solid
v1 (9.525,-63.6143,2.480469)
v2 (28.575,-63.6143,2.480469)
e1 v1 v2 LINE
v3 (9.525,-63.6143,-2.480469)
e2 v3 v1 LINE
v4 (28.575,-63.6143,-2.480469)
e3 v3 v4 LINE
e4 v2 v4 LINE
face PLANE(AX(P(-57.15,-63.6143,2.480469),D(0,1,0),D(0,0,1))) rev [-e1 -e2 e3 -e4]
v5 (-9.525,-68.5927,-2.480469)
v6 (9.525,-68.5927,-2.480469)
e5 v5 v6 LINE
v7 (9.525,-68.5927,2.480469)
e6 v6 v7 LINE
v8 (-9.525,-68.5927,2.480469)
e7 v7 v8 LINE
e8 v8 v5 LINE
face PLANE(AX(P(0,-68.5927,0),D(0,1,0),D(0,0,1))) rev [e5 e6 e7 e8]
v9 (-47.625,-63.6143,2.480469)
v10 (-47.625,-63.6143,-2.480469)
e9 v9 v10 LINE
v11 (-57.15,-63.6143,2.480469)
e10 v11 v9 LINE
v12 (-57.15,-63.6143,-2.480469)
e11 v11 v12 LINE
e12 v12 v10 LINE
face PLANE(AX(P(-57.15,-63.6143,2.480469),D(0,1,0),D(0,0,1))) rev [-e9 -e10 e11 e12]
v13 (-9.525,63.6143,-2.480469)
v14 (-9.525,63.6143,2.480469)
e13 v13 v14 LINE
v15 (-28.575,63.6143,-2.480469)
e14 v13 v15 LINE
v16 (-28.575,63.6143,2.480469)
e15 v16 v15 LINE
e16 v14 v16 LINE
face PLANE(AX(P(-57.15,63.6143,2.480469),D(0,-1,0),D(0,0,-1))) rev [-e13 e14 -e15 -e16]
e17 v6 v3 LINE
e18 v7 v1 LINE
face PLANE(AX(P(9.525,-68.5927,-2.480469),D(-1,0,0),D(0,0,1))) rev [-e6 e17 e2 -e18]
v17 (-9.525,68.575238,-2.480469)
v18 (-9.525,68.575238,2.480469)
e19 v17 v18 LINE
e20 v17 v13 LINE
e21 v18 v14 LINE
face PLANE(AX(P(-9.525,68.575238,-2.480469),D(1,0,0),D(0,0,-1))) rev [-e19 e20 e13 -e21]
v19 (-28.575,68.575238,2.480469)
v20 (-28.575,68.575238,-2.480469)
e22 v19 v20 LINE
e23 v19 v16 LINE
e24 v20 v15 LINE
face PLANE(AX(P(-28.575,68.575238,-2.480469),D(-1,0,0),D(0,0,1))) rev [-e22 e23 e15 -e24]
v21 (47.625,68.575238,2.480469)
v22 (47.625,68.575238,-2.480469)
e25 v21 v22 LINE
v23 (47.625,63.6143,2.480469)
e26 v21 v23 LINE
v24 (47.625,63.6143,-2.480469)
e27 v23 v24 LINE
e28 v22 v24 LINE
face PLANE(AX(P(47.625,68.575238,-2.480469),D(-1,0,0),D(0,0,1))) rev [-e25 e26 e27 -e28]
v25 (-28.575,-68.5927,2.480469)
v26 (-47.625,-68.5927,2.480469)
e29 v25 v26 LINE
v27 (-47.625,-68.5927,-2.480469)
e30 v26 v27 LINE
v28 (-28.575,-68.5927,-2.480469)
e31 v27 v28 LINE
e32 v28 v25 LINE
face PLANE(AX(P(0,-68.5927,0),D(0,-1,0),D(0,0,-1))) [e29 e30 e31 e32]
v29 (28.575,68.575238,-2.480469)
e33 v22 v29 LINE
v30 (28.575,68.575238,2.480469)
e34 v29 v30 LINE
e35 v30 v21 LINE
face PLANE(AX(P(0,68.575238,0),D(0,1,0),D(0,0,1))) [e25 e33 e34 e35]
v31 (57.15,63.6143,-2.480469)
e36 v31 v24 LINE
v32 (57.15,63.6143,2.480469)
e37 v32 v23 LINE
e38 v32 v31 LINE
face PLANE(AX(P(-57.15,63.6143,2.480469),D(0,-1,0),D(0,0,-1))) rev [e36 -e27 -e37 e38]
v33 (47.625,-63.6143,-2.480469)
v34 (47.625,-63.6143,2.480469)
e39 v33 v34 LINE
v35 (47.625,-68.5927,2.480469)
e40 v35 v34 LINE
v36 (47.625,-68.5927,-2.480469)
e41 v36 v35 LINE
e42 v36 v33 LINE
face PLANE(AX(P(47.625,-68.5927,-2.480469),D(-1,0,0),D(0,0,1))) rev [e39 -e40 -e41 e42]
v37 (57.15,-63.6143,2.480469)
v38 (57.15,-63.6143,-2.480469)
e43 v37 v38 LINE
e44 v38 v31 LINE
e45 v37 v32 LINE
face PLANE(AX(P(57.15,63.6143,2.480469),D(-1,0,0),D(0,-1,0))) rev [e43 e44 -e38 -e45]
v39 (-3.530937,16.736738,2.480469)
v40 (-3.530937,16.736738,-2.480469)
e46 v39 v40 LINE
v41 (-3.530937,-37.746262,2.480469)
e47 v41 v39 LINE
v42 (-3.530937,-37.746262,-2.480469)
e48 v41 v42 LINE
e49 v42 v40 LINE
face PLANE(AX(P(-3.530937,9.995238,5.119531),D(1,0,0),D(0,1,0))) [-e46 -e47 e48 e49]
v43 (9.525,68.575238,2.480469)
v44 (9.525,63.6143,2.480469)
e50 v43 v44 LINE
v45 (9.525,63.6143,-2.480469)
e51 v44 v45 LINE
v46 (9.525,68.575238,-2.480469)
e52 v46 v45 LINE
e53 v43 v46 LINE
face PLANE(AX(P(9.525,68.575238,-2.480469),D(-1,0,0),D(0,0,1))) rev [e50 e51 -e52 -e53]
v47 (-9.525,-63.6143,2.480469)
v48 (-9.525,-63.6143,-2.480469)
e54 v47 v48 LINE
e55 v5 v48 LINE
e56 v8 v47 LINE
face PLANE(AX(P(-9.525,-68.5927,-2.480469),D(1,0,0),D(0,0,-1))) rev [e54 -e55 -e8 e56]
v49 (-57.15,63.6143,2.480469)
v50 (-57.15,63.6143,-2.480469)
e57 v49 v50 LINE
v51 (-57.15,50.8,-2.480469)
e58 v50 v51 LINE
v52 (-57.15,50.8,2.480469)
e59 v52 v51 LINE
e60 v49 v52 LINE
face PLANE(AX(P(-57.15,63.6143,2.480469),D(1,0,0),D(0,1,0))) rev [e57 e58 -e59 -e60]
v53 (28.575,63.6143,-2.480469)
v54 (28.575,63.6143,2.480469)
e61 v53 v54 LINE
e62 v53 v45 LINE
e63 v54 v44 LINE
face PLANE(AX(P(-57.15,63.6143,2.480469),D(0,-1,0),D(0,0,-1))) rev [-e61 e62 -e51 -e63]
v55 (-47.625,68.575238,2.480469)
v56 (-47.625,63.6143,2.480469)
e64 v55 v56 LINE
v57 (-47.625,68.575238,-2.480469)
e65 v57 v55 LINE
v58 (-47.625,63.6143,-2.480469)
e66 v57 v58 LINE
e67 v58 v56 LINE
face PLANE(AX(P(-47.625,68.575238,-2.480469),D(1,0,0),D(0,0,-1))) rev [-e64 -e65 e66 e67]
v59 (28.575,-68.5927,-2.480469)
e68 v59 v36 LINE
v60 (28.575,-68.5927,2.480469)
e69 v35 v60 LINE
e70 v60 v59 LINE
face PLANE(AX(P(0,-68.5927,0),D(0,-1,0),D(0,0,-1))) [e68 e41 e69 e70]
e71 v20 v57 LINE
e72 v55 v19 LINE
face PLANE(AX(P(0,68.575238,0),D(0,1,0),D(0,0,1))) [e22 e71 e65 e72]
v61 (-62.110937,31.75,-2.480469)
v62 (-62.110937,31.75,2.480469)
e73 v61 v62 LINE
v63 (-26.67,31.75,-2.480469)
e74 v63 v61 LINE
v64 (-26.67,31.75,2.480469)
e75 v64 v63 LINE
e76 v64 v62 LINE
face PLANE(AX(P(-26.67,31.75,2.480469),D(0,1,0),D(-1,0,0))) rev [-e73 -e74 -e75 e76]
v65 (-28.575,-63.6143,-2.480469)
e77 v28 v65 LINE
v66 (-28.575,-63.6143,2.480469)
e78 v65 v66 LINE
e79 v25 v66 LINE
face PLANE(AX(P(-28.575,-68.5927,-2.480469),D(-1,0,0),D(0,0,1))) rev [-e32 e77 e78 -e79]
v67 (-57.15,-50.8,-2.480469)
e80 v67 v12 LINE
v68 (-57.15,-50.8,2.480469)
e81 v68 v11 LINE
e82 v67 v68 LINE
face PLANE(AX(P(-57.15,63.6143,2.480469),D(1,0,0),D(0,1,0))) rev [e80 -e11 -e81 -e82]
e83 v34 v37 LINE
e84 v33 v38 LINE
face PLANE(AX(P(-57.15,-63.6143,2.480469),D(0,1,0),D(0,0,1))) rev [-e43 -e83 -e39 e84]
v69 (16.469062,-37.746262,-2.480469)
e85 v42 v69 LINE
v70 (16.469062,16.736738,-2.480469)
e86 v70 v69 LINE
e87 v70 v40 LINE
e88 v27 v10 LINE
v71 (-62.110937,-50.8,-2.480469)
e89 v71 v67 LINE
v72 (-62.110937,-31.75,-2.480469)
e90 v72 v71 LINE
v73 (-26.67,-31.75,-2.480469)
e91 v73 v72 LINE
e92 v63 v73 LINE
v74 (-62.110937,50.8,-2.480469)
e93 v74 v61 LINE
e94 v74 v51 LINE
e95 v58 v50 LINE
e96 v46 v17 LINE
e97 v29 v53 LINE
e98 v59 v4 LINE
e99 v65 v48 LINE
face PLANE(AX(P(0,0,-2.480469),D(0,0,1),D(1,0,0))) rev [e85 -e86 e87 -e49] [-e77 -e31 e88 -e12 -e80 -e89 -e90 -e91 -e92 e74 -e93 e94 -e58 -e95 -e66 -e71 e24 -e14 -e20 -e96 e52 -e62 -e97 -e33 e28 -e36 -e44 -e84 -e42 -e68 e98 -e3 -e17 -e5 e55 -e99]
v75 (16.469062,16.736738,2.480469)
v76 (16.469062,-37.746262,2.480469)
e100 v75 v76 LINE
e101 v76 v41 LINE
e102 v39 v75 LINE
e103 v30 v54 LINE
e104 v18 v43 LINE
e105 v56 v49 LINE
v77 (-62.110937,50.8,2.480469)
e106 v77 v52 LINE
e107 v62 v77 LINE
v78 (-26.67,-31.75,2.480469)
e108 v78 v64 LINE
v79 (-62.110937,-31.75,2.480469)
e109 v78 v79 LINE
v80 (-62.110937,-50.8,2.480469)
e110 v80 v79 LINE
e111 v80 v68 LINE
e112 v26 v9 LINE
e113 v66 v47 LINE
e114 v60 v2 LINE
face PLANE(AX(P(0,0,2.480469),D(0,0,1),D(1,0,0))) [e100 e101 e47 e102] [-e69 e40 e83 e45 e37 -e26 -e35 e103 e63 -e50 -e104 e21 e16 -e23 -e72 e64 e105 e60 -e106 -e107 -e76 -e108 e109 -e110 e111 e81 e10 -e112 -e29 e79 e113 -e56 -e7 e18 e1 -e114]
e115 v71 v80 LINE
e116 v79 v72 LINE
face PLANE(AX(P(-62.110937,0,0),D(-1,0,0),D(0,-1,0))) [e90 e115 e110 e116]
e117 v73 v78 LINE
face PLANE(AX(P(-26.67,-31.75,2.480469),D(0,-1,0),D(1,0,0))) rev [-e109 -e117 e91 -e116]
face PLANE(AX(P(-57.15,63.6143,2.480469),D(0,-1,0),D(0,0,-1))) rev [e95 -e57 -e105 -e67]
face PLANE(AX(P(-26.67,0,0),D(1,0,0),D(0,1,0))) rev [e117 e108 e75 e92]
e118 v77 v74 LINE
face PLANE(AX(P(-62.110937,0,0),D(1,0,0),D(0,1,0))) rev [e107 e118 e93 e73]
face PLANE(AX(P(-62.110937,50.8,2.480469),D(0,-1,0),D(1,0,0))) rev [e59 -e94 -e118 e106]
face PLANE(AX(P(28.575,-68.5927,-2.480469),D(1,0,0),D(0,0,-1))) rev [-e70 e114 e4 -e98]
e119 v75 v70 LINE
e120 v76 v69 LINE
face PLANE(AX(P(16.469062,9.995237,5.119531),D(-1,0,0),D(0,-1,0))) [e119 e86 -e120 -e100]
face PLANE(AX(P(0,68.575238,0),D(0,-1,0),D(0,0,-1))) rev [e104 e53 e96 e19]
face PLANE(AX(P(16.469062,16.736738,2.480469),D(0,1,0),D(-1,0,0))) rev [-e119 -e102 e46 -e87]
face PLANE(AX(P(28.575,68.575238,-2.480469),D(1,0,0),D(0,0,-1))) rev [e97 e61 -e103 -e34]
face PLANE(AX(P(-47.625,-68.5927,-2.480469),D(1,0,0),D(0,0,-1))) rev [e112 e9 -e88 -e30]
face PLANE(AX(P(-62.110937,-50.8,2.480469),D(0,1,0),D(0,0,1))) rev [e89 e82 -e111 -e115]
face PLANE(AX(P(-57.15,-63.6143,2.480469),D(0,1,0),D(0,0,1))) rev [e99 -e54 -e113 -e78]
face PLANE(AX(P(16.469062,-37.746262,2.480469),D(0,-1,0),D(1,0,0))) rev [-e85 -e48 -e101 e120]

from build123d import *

# Parameters (mm, degrees)
SKETCH1_W           = 114.3
SKETCH1_H           = 127.2286
BOSS_EXTRUDE1_DEPTH = 2.48046875
SKETCH3_W           = 19.05
SKETCH3_H           = 4.9609375
BOSS_EXTRUDE2_DEPTH = 4.9609375
SKETCH5_W           = 19.05
SKETCH5_H           = 4.9609375
BOSS_EXTRUDE3_DEPTH = 4.9784
SKETCH7_W           = 4.9609375
SKETCH7_H           = 63.5
CUT_EXTRUDE1_DEPTH  = 30.48
SKETCH6_W           = 4.9609375
SKETCH6_H           = 19.05
BOSS_EXTRUDE4_DEPTH = 4.9609375
CAVITY1_START       = -3.0309375
CAVITY1_2_OUTLINE_W = 41
CAVITY1_2_OUTLINE_H = 4.9609375
CAVITY1_2_DEPTH     = 19
CAVITY1_START_2     = -2.3309375
CAVITY1_3_DEPTH     = 17.6
CAVITY1_START_3     = -3
CAVITY1_4_DEPTH     = 6
CAVITY1_START_4     = 0.91953125
CAVITY1_6_OUTLINE_R = 3
CAVITY1_6_DEPTH     = 1.5609375
SKETCH9_W           = 20
SKETCH9_H           = 54.483
CUT_EXTRUDE2_DEPTH  = 93.827315363


with BuildPart() as part:
    # Sketch1 → Boss-Extrude1 (new, symmetric)
    with BuildSketch(Plane.XY):
        Rectangle(SKETCH1_W, SKETCH1_H)
    extrude(amount=BOSS_EXTRUDE1_DEPTH, both=True)

    # Sketch3 → Boss-Extrude2 (add)
    with BuildSketch(Plane(origin=(0, 63.6143, 0), x_dir=(1, 0, 0), z_dir=(0, 1, 0))):
        with Locations((38.1, 0)):
            Rectangle(SKETCH3_W, SKETCH3_H)
        Rectangle(SKETCH3_W, SKETCH3_H)
        with Locations((-38.1, 0)):
            Rectangle(SKETCH3_W, SKETCH3_H)
    extrude(amount=BOSS_EXTRUDE2_DEPTH)

    # Sketch5 → Boss-Extrude3 (add)
    with BuildSketch(Plane.XZ.offset(63.6143)):
        Rectangle(SKETCH5_W, SKETCH5_H)
        with Locations((38.1, 0)):
            Rectangle(SKETCH5_W, SKETCH5_H)
        with Locations((-38.1, 0)):
            Rectangle(SKETCH5_W, SKETCH5_H)
    extrude(amount=BOSS_EXTRUDE3_DEPTH)

    # Sketch7 → Cut-Extrude1 (cut)
    with BuildSketch(Plane.ZY.offset(57.15)):
        Rectangle(SKETCH7_W, SKETCH7_H)
    extrude(amount=-CUT_EXTRUDE1_DEPTH, mode=Mode.SUBTRACT)

    # Sketch6 → Boss-Extrude4 (add)
    with BuildSketch(Plane.ZY.offset(57.15)):
        with Locations((0, 41.275)):
            Rectangle(SKETCH6_W, SKETCH6_H)
        with Locations((0, -41.275)):
            Rectangle(SKETCH6_W, SKETCH6_H)
    extrude(amount=BOSS_EXTRUDE4_DEPTH)

    # Cavity1: read off the stored shape, not the designer's step
    # Cavity1 outline → Cavity1 (revolve, cut)
    with BuildSketch(Plane(origin=(15.2690625, 0, -2.53046875), x_dir=(1, 0, 0), z_dir=(0, 0, 1))):
        with BuildLine():
            ThreePointArc((0.05, -31.0547625), (0.064644661, -31.019407161), (0.1, -31.0047625))
            Line((0.1, -31.0047625), (0.1, 9.9952375))
            ThreePointArc((0.1, 9.9952375), (0.064644661, 10.009882161), (0.05, 10.0452375))
            Line((0.05, 10.0452375), (0.05, -31.0547625))
        make_face()
    revolve(axis=Axis((15.2690625, 0, -2.53046875), (0, 1, 0)), mode=Mode.SUBTRACT)

    # Cavity1 2 outline → Cavity1 2 (cut)
    with BuildSketch(Plane.YZ.offset(CAVITY1_START)):
        with Locations((-10.5047625, 0)):
            Rectangle(CAVITY1_2_OUTLINE_W, CAVITY1_2_OUTLINE_H)
    extrude(amount=CAVITY1_2_DEPTH, mode=Mode.SUBTRACT)

    # Cavity1 3 outline → Cavity1 3 (cut)
    with BuildSketch(Plane.YZ.offset(CAVITY1_START_2)):
        with BuildLine():
            ThreePointArc((-31.0047625, -2.43046875), (-31.019407161, -2.465824089), (-31.0547625, -2.48046875))
            Line((-31.0547625, -2.48046875), (-31.0047625, -2.48046875))
            Line((-31.0047625, -2.48046875), (-31.0047625, -2.43046875))
        make_face()
        with BuildLine():
            Line((9.9952375, -2.43046875), (9.9952375, -2.48046875))
            Line((9.9952375, -2.48046875), (10.0452375, -2.48046875))
            ThreePointArc((10.0452375, -2.48046875), (10.009882161, -2.465824089), (9.9952375, -2.43046875))
        make_face()
    extrude(amount=CAVITY1_3_DEPTH, mode=Mode.SUBTRACT)

    # Cavity1 4 outline → Cavity1 4 (cut)
    with BuildSketch(Plane.XY.offset(CAVITY1_START_3)):
        with BuildLine():
            ThreePointArc((15.9690625, -31.0047625), (16.322615891, -30.858315891), (16.4690625, -30.5047625))
            Line((16.4690625, -30.5047625), (16.4690625, 9.4952375))
            ThreePointArc((16.4690625, 9.4952375), (16.322615891, 9.848790891), (15.9690625, 9.9952375))
            Line((15.9690625, 9.9952375), (15.9690625, -31.0047625))
        make_face()
        with BuildLine():
            ThreePointArc((-3.0309375, 9.9952375), (-3.384490891, 9.848790891), (-3.5309375, 9.4952375))
            Line((-3.5309375, 9.4952375), (-3.5309375, -30.5047625))
            ThreePointArc((-3.5309375, -30.5047625), (-3.384490891, -30.858315891), (-3.0309375, -31.0047625))
            Line((-3.0309375, -31.0047625), (-3.0309375, 9.9952375))
        make_face()
    extrude(amount=CAVITY1_4_DEPTH, mode=Mode.SUBTRACT)

    # Cavity1 5 outline → Cavity1 5 (revolve, cut)
    with BuildSketch(Plane(origin=(-2.3309375, 0, -2.53046875), x_dir=(1, 0, 0), z_dir=(0, 0, 1))):
        with BuildLine():
            ThreePointArc((0.05, -31.0547625), (0.064644661, -31.019407161), (0.1, -31.0047625))
            Line((0.1, -31.0047625), (0.05, -31.0047625))
            Line((0.05, -31.0047625), (0.05, -31.0547625))
        make_face()
        with BuildLine():
            Line((0.05, 9.9952375), (0.1, 9.9952375))
            ThreePointArc((0.1, 9.9952375), (0.064644661, 10.009882161), (0.05, 10.0452375))
            Line((0.05, 10.0452375), (0.05, 9.9952375))
        make_face()
    revolve(axis=Axis((-2.3309375, 0, -2.53046875), (0, 1, 0)), mode=Mode.SUBTRACT)


with BuildPart() as body_2:
    # Cavity1 6 outline → Cavity1 6 (new body)
    with BuildSketch(Plane.XY.offset(CAVITY1_START_4)):
        with Locations((6.4690625, -0.0047625)):
            Circle(CAVITY1_6_OUTLINE_R)
    extrude(amount=CAVITY1_6_DEPTH)


with BuildPart() as cut_extrude2_tool:
    # Sketch9 → Cut-Extrude2 (new, through all)
    with BuildSketch(Plane(origin=(0, 0, -4.88046875), x_dir=(-1, 0, 0), z_dir=(0, 0, -1))):
        with Locations((-6.4690625, -10.5047625)):
            Rectangle(SKETCH9_W, SKETCH9_H)
    extrude(amount=-CUT_EXTRUDE2_DEPTH)


with BuildPart() as part_1:
    add(part.part)

    # Cut-Extrude2: cut by cut_extrude2_tool
    add(cut_extrude2_tool.part, mode=Mode.SUBTRACT)


with BuildPart() as body_2_1:
    add(body_2.part)

    # Cut-Extrude2: cut by cut_extrude2_tool
    add(cut_extrude2_tool.part, mode=Mode.SUBTRACT)


solid = part_1.part
